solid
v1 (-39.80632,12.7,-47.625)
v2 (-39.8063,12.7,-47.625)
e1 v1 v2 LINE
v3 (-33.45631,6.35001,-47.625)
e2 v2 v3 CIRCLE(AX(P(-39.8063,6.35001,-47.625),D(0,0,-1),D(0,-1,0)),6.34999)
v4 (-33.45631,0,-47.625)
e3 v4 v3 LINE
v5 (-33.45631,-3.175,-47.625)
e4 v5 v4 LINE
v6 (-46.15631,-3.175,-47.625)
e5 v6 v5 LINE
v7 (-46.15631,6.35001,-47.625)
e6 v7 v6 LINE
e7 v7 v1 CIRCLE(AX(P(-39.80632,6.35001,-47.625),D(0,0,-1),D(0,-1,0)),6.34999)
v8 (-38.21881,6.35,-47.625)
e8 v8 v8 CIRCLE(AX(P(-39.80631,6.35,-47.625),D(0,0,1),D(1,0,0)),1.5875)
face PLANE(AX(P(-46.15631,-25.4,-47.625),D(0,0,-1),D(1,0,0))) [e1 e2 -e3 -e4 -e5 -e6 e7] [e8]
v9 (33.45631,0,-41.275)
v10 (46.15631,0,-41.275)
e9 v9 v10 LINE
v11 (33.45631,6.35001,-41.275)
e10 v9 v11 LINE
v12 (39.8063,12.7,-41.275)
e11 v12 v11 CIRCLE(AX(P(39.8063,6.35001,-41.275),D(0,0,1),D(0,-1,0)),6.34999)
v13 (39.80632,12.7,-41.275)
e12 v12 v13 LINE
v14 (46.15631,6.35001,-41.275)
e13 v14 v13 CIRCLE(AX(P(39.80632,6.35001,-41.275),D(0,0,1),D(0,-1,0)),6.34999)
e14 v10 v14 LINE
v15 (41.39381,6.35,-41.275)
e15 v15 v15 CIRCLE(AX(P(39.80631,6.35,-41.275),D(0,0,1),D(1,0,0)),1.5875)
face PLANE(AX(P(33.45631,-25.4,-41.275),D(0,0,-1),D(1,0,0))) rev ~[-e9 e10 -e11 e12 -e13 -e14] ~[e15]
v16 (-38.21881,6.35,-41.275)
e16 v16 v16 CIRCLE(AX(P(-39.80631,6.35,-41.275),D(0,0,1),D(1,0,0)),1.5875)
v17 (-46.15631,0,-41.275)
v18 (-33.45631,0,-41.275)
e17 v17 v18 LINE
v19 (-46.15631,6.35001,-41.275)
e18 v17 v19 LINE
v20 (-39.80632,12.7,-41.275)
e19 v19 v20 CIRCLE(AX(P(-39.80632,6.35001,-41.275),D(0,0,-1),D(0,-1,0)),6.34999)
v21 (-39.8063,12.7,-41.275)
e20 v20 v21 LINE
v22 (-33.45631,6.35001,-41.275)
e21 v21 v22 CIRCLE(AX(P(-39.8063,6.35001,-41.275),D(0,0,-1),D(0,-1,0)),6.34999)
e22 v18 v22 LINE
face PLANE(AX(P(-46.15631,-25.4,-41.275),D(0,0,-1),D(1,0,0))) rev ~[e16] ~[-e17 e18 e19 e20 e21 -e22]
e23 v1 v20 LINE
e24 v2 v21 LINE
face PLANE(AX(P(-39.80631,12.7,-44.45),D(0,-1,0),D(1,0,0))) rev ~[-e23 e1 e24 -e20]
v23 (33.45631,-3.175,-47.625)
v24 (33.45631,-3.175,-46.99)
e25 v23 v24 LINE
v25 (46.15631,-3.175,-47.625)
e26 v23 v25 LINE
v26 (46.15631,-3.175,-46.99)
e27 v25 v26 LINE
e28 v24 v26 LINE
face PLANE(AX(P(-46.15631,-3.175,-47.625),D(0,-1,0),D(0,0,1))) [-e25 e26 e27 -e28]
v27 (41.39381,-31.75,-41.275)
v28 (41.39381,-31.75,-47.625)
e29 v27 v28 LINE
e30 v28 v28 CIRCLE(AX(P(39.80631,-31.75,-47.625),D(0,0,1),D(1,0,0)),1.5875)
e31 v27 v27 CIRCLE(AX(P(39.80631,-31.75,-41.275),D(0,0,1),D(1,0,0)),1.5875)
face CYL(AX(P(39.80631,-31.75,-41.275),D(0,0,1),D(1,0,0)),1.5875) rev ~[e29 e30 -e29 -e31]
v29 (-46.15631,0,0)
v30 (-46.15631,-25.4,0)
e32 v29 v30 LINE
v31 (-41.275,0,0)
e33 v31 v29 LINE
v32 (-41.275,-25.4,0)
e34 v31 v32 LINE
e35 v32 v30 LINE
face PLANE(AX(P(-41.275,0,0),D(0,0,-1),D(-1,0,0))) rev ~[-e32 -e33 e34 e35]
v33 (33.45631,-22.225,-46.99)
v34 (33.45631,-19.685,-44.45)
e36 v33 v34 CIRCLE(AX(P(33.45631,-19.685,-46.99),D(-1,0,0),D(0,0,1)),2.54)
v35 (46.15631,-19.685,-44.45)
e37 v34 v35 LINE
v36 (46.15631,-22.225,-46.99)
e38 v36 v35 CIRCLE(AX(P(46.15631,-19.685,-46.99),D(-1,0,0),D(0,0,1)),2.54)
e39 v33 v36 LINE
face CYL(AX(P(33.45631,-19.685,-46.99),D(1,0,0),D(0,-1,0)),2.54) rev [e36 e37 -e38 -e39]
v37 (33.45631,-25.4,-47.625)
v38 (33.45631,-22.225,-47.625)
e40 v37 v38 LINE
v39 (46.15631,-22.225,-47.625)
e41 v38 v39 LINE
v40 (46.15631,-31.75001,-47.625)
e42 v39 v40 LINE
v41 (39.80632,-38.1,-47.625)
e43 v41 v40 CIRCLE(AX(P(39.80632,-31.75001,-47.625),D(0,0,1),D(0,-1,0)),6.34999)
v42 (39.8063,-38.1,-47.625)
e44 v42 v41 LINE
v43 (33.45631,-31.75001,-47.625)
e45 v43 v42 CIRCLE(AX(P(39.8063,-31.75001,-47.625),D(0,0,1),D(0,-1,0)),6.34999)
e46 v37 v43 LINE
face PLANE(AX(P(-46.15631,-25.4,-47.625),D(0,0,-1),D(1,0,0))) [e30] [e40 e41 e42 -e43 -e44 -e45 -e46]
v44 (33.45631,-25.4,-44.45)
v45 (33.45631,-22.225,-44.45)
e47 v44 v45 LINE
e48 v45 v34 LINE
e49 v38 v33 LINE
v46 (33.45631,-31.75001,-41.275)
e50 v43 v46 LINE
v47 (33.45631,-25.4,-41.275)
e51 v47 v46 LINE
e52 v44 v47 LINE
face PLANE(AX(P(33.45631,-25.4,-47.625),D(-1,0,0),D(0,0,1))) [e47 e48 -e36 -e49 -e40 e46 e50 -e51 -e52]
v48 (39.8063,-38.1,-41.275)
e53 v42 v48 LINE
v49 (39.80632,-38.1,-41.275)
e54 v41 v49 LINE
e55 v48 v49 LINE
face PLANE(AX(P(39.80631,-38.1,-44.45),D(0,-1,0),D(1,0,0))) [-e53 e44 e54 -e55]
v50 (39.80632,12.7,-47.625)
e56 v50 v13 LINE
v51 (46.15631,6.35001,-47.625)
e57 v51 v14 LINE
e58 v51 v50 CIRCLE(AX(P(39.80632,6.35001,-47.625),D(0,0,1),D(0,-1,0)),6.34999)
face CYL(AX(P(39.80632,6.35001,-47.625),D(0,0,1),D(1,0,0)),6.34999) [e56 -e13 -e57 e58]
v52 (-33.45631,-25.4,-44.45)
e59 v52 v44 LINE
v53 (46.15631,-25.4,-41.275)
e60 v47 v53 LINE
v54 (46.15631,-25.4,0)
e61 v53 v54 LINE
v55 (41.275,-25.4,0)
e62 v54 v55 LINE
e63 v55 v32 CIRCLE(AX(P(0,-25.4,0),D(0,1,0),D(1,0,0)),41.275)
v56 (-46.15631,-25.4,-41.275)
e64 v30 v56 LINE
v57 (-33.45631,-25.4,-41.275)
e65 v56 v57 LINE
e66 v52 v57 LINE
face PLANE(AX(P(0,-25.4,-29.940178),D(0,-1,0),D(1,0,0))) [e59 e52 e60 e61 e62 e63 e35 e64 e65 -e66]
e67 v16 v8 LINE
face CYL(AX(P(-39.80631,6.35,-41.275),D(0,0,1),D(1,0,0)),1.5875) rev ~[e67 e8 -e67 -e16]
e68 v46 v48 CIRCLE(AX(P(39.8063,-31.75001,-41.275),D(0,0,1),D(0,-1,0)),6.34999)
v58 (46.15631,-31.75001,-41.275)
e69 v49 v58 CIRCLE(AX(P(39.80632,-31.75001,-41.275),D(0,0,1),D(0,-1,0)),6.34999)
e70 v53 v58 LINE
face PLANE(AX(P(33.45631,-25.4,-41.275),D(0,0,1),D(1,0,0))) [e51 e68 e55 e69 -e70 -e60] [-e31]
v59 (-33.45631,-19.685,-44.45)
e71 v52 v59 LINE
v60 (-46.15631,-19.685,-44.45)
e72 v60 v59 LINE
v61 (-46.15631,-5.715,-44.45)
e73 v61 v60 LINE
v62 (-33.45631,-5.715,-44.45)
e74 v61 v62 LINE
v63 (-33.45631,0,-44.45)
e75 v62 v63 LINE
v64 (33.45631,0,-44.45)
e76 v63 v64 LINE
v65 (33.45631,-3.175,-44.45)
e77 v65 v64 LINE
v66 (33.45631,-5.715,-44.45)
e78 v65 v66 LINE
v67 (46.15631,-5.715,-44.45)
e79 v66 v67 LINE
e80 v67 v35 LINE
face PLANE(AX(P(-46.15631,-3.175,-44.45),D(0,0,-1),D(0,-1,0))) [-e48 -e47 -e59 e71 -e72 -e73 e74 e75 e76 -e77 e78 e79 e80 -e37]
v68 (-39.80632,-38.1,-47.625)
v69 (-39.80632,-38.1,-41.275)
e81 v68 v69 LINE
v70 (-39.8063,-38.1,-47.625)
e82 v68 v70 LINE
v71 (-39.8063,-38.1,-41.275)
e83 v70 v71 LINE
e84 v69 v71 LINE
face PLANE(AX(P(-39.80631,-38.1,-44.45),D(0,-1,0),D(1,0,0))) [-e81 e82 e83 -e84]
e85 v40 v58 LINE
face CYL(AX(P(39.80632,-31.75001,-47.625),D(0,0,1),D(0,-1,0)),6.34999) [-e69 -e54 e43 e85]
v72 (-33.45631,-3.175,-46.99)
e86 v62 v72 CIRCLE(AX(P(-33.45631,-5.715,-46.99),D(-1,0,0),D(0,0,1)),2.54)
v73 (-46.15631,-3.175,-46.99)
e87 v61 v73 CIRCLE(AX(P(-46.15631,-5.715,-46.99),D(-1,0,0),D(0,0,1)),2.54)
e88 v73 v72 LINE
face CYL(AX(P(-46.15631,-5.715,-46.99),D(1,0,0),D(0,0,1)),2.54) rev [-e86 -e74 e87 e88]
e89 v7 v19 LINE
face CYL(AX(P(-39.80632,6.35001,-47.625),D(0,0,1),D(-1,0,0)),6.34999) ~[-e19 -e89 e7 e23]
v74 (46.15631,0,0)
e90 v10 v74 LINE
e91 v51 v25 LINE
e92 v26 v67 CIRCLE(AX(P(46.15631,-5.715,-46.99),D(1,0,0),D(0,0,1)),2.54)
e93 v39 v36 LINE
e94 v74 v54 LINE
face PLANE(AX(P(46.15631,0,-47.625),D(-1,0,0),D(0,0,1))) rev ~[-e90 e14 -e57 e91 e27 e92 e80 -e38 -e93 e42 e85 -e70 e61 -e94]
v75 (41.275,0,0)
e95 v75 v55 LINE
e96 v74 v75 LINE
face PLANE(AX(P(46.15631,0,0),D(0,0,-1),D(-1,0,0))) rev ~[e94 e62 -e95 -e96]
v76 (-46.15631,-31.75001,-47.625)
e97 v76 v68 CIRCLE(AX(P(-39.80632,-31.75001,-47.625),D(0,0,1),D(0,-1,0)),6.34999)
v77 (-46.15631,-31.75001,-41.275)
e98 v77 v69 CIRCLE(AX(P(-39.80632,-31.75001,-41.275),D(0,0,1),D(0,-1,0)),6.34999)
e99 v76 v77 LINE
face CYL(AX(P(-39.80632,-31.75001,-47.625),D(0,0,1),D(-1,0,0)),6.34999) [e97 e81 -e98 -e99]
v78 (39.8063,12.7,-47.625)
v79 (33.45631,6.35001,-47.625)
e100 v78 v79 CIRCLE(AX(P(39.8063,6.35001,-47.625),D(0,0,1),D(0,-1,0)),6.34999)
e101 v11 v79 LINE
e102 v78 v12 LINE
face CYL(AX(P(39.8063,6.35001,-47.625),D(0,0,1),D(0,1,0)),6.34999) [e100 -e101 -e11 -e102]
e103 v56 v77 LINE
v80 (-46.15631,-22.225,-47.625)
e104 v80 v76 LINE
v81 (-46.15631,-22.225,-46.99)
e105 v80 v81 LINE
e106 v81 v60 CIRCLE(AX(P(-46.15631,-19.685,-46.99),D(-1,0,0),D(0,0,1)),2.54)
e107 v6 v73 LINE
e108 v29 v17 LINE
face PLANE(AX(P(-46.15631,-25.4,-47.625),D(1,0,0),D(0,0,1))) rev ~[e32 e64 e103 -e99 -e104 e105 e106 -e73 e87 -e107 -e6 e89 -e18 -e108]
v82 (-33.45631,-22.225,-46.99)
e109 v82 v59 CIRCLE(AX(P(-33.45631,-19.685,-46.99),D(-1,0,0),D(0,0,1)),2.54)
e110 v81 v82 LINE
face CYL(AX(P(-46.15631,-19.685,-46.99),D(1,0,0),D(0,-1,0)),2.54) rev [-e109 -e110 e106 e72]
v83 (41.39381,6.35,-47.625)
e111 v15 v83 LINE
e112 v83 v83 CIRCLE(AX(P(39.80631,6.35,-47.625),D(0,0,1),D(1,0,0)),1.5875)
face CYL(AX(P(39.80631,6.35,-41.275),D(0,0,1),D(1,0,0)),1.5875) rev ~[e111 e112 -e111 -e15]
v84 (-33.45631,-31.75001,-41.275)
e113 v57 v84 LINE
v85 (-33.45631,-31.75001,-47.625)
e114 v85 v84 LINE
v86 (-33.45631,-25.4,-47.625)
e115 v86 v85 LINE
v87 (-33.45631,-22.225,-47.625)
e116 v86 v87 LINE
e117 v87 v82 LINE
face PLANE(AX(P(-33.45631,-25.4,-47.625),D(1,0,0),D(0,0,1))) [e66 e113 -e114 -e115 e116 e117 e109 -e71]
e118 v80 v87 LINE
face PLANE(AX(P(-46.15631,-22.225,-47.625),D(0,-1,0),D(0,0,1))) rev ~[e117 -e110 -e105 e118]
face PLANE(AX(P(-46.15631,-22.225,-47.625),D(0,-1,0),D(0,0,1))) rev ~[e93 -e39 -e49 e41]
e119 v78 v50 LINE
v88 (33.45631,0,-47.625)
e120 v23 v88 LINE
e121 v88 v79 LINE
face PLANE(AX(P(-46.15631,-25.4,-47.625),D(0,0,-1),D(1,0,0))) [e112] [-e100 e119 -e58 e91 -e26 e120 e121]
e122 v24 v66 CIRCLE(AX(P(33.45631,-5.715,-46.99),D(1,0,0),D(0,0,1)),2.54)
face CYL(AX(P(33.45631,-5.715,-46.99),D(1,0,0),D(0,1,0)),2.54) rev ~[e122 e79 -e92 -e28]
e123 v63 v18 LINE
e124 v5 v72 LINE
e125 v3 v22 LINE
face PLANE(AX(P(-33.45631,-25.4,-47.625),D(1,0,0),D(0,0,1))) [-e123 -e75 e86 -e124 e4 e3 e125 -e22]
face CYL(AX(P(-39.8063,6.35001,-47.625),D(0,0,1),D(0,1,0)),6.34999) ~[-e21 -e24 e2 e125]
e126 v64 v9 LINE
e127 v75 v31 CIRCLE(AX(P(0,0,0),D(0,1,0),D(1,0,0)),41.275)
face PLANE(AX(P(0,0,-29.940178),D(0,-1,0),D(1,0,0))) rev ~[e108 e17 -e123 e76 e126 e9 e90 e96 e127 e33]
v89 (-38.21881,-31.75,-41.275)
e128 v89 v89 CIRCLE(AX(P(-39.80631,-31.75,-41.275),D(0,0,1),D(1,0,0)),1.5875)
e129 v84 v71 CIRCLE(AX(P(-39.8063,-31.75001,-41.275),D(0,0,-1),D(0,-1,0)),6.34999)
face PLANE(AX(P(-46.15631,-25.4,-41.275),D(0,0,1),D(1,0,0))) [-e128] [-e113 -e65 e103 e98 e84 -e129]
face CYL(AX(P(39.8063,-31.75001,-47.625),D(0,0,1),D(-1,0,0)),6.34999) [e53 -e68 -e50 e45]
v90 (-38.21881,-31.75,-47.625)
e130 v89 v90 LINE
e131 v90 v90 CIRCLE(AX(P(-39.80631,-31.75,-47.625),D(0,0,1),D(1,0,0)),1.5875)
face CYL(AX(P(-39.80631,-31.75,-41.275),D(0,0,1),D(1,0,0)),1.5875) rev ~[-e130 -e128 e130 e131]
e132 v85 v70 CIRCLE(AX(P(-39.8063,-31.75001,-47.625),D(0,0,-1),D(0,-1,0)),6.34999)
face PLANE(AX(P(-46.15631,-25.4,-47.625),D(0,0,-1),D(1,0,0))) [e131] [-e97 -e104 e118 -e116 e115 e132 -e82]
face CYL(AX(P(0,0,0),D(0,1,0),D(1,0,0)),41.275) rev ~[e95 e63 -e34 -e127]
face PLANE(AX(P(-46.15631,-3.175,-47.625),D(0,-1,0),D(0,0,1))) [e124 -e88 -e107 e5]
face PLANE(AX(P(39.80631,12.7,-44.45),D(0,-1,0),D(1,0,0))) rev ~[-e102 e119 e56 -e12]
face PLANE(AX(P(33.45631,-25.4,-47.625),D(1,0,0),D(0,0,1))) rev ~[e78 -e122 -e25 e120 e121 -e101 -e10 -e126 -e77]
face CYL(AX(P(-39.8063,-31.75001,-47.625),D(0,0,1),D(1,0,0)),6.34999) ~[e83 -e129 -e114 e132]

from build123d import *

# Parameters (mm, degrees)
F1_DEPTH      = 25.4
F2_W          = 12.7
F2_H          = 6.35
F3_DEPTH      = 12.7
F3_DEPTH_BACK = 38.1
F4_R          = 6.34999
F5_W          = 19.05
F5_H          = 3.175
F6_DEPTH      = 92.3136190901
F7_W          = 66.9126190901
F7_H          = 3.175
F8_DEPTH      = 38.101
F9_R          = 2.54
F10_R         = 1.5875
F11_DEPTH     = 6.351


# Not quite as in the source:
# - a fillet or chamfer is up to 0.001 mm smaller than in the source, because OpenCascade refuses the exact size


with BuildPart() as f1:
    # F0 (on Front) → F1 (new body)
    with BuildSketch(Plane.XZ):
        with BuildLine():
            ThreePointArc((41.275, 0), (0, -41.275), (-41.275, 0))
            Line((-41.275, 0), (-46.156309545, 0))
            Line((-46.156309545, 0), (-46.156309545, -47.625))
            Line((-46.156309545, -47.625), (46.156309545, -47.625))
            Line((46.156309545, -47.625), (46.156309545, 0))
            Line((46.156309545, 0), (41.275, 0))
        make_face()
    extrude(amount=F1_DEPTH)

    # F2 (on face) → F3 (join, two sides)
    with BuildSketch(Plane.XZ.offset(25.4)) as f3_sk:
        with Locations((-39.806309545, -44.45)):
            Rectangle(F2_W, F2_H)
        with Locations((39.806309545, -44.45)):
            Rectangle(F2_W, F2_H)
    extrude(amount=F3_DEPTH)
    extrude(f3_sk.sketch, amount=-F3_DEPTH_BACK)

    # F4 (radius 6.35 in the source; OpenCascade refuses exactly that, so slightly less here)
    f4_edges = [f1.edges().sort_by_distance(p)[0] for p in [
        (-46.15631, 12.7, -44.45),
        (-33.45631, 12.7, -44.45),
        (-46.15631, -38.1, -44.45),
        (-33.45631, -38.1, -44.45),
        (33.45631, -38.1, -44.45),
        (46.15631, -38.1, -44.45),
        (33.45631, 12.7, -44.45),
        (46.15631, 12.7, -44.45),
    ]]
    fillet(f4_edges, radius=F4_R)

    # F5 (on face) → F6 (cut, through all)
    with BuildSketch(Plane(origin=(-46.156309545, 0, 0), x_dir=(0, -1, 0), z_dir=(-1, 0, 0))):
        with Locations((12.7, -46.0375)):
            Rectangle(F5_W, F5_H)
    extrude(amount=-F6_DEPTH, mode=Mode.SUBTRACT)

    # F7 (on face) → F8 (cut, through all)
    with BuildSketch(Plane.XZ.offset(25.4)):
        with Locations((0, -46.0375)):
            Rectangle(F7_W, F7_H)
    extrude(amount=-F8_DEPTH, mode=Mode.SUBTRACT)

    # F9
    f9_edges = [f1.edges().sort_by_distance(p)[0] for p in [
        (-39.80631, -22.225, -44.45),
        (-39.80631, -3.175, -44.45),
        (39.80631, -3.175, -44.45),
        (39.80631, -22.225, -44.45),
    ]]
    fillet(f9_edges, radius=F9_R)

    # F10 (on face) → F11 (cut, through all)
    with BuildSketch(Plane.XY.offset(-41.275)):
        with Locations((-39.806309545, -31.75)):
            Circle(F10_R)
        with Locations((-39.806309545, 6.35)):
            Circle(F10_R)
        with Locations((39.806309545, -31.75)):
            Circle(F10_R)
        with Locations((39.806309545, 6.35)):
            Circle(F10_R)
    extrude(amount=-F11_DEPTH, mode=Mode.SUBTRACT)


solid = f1.part
